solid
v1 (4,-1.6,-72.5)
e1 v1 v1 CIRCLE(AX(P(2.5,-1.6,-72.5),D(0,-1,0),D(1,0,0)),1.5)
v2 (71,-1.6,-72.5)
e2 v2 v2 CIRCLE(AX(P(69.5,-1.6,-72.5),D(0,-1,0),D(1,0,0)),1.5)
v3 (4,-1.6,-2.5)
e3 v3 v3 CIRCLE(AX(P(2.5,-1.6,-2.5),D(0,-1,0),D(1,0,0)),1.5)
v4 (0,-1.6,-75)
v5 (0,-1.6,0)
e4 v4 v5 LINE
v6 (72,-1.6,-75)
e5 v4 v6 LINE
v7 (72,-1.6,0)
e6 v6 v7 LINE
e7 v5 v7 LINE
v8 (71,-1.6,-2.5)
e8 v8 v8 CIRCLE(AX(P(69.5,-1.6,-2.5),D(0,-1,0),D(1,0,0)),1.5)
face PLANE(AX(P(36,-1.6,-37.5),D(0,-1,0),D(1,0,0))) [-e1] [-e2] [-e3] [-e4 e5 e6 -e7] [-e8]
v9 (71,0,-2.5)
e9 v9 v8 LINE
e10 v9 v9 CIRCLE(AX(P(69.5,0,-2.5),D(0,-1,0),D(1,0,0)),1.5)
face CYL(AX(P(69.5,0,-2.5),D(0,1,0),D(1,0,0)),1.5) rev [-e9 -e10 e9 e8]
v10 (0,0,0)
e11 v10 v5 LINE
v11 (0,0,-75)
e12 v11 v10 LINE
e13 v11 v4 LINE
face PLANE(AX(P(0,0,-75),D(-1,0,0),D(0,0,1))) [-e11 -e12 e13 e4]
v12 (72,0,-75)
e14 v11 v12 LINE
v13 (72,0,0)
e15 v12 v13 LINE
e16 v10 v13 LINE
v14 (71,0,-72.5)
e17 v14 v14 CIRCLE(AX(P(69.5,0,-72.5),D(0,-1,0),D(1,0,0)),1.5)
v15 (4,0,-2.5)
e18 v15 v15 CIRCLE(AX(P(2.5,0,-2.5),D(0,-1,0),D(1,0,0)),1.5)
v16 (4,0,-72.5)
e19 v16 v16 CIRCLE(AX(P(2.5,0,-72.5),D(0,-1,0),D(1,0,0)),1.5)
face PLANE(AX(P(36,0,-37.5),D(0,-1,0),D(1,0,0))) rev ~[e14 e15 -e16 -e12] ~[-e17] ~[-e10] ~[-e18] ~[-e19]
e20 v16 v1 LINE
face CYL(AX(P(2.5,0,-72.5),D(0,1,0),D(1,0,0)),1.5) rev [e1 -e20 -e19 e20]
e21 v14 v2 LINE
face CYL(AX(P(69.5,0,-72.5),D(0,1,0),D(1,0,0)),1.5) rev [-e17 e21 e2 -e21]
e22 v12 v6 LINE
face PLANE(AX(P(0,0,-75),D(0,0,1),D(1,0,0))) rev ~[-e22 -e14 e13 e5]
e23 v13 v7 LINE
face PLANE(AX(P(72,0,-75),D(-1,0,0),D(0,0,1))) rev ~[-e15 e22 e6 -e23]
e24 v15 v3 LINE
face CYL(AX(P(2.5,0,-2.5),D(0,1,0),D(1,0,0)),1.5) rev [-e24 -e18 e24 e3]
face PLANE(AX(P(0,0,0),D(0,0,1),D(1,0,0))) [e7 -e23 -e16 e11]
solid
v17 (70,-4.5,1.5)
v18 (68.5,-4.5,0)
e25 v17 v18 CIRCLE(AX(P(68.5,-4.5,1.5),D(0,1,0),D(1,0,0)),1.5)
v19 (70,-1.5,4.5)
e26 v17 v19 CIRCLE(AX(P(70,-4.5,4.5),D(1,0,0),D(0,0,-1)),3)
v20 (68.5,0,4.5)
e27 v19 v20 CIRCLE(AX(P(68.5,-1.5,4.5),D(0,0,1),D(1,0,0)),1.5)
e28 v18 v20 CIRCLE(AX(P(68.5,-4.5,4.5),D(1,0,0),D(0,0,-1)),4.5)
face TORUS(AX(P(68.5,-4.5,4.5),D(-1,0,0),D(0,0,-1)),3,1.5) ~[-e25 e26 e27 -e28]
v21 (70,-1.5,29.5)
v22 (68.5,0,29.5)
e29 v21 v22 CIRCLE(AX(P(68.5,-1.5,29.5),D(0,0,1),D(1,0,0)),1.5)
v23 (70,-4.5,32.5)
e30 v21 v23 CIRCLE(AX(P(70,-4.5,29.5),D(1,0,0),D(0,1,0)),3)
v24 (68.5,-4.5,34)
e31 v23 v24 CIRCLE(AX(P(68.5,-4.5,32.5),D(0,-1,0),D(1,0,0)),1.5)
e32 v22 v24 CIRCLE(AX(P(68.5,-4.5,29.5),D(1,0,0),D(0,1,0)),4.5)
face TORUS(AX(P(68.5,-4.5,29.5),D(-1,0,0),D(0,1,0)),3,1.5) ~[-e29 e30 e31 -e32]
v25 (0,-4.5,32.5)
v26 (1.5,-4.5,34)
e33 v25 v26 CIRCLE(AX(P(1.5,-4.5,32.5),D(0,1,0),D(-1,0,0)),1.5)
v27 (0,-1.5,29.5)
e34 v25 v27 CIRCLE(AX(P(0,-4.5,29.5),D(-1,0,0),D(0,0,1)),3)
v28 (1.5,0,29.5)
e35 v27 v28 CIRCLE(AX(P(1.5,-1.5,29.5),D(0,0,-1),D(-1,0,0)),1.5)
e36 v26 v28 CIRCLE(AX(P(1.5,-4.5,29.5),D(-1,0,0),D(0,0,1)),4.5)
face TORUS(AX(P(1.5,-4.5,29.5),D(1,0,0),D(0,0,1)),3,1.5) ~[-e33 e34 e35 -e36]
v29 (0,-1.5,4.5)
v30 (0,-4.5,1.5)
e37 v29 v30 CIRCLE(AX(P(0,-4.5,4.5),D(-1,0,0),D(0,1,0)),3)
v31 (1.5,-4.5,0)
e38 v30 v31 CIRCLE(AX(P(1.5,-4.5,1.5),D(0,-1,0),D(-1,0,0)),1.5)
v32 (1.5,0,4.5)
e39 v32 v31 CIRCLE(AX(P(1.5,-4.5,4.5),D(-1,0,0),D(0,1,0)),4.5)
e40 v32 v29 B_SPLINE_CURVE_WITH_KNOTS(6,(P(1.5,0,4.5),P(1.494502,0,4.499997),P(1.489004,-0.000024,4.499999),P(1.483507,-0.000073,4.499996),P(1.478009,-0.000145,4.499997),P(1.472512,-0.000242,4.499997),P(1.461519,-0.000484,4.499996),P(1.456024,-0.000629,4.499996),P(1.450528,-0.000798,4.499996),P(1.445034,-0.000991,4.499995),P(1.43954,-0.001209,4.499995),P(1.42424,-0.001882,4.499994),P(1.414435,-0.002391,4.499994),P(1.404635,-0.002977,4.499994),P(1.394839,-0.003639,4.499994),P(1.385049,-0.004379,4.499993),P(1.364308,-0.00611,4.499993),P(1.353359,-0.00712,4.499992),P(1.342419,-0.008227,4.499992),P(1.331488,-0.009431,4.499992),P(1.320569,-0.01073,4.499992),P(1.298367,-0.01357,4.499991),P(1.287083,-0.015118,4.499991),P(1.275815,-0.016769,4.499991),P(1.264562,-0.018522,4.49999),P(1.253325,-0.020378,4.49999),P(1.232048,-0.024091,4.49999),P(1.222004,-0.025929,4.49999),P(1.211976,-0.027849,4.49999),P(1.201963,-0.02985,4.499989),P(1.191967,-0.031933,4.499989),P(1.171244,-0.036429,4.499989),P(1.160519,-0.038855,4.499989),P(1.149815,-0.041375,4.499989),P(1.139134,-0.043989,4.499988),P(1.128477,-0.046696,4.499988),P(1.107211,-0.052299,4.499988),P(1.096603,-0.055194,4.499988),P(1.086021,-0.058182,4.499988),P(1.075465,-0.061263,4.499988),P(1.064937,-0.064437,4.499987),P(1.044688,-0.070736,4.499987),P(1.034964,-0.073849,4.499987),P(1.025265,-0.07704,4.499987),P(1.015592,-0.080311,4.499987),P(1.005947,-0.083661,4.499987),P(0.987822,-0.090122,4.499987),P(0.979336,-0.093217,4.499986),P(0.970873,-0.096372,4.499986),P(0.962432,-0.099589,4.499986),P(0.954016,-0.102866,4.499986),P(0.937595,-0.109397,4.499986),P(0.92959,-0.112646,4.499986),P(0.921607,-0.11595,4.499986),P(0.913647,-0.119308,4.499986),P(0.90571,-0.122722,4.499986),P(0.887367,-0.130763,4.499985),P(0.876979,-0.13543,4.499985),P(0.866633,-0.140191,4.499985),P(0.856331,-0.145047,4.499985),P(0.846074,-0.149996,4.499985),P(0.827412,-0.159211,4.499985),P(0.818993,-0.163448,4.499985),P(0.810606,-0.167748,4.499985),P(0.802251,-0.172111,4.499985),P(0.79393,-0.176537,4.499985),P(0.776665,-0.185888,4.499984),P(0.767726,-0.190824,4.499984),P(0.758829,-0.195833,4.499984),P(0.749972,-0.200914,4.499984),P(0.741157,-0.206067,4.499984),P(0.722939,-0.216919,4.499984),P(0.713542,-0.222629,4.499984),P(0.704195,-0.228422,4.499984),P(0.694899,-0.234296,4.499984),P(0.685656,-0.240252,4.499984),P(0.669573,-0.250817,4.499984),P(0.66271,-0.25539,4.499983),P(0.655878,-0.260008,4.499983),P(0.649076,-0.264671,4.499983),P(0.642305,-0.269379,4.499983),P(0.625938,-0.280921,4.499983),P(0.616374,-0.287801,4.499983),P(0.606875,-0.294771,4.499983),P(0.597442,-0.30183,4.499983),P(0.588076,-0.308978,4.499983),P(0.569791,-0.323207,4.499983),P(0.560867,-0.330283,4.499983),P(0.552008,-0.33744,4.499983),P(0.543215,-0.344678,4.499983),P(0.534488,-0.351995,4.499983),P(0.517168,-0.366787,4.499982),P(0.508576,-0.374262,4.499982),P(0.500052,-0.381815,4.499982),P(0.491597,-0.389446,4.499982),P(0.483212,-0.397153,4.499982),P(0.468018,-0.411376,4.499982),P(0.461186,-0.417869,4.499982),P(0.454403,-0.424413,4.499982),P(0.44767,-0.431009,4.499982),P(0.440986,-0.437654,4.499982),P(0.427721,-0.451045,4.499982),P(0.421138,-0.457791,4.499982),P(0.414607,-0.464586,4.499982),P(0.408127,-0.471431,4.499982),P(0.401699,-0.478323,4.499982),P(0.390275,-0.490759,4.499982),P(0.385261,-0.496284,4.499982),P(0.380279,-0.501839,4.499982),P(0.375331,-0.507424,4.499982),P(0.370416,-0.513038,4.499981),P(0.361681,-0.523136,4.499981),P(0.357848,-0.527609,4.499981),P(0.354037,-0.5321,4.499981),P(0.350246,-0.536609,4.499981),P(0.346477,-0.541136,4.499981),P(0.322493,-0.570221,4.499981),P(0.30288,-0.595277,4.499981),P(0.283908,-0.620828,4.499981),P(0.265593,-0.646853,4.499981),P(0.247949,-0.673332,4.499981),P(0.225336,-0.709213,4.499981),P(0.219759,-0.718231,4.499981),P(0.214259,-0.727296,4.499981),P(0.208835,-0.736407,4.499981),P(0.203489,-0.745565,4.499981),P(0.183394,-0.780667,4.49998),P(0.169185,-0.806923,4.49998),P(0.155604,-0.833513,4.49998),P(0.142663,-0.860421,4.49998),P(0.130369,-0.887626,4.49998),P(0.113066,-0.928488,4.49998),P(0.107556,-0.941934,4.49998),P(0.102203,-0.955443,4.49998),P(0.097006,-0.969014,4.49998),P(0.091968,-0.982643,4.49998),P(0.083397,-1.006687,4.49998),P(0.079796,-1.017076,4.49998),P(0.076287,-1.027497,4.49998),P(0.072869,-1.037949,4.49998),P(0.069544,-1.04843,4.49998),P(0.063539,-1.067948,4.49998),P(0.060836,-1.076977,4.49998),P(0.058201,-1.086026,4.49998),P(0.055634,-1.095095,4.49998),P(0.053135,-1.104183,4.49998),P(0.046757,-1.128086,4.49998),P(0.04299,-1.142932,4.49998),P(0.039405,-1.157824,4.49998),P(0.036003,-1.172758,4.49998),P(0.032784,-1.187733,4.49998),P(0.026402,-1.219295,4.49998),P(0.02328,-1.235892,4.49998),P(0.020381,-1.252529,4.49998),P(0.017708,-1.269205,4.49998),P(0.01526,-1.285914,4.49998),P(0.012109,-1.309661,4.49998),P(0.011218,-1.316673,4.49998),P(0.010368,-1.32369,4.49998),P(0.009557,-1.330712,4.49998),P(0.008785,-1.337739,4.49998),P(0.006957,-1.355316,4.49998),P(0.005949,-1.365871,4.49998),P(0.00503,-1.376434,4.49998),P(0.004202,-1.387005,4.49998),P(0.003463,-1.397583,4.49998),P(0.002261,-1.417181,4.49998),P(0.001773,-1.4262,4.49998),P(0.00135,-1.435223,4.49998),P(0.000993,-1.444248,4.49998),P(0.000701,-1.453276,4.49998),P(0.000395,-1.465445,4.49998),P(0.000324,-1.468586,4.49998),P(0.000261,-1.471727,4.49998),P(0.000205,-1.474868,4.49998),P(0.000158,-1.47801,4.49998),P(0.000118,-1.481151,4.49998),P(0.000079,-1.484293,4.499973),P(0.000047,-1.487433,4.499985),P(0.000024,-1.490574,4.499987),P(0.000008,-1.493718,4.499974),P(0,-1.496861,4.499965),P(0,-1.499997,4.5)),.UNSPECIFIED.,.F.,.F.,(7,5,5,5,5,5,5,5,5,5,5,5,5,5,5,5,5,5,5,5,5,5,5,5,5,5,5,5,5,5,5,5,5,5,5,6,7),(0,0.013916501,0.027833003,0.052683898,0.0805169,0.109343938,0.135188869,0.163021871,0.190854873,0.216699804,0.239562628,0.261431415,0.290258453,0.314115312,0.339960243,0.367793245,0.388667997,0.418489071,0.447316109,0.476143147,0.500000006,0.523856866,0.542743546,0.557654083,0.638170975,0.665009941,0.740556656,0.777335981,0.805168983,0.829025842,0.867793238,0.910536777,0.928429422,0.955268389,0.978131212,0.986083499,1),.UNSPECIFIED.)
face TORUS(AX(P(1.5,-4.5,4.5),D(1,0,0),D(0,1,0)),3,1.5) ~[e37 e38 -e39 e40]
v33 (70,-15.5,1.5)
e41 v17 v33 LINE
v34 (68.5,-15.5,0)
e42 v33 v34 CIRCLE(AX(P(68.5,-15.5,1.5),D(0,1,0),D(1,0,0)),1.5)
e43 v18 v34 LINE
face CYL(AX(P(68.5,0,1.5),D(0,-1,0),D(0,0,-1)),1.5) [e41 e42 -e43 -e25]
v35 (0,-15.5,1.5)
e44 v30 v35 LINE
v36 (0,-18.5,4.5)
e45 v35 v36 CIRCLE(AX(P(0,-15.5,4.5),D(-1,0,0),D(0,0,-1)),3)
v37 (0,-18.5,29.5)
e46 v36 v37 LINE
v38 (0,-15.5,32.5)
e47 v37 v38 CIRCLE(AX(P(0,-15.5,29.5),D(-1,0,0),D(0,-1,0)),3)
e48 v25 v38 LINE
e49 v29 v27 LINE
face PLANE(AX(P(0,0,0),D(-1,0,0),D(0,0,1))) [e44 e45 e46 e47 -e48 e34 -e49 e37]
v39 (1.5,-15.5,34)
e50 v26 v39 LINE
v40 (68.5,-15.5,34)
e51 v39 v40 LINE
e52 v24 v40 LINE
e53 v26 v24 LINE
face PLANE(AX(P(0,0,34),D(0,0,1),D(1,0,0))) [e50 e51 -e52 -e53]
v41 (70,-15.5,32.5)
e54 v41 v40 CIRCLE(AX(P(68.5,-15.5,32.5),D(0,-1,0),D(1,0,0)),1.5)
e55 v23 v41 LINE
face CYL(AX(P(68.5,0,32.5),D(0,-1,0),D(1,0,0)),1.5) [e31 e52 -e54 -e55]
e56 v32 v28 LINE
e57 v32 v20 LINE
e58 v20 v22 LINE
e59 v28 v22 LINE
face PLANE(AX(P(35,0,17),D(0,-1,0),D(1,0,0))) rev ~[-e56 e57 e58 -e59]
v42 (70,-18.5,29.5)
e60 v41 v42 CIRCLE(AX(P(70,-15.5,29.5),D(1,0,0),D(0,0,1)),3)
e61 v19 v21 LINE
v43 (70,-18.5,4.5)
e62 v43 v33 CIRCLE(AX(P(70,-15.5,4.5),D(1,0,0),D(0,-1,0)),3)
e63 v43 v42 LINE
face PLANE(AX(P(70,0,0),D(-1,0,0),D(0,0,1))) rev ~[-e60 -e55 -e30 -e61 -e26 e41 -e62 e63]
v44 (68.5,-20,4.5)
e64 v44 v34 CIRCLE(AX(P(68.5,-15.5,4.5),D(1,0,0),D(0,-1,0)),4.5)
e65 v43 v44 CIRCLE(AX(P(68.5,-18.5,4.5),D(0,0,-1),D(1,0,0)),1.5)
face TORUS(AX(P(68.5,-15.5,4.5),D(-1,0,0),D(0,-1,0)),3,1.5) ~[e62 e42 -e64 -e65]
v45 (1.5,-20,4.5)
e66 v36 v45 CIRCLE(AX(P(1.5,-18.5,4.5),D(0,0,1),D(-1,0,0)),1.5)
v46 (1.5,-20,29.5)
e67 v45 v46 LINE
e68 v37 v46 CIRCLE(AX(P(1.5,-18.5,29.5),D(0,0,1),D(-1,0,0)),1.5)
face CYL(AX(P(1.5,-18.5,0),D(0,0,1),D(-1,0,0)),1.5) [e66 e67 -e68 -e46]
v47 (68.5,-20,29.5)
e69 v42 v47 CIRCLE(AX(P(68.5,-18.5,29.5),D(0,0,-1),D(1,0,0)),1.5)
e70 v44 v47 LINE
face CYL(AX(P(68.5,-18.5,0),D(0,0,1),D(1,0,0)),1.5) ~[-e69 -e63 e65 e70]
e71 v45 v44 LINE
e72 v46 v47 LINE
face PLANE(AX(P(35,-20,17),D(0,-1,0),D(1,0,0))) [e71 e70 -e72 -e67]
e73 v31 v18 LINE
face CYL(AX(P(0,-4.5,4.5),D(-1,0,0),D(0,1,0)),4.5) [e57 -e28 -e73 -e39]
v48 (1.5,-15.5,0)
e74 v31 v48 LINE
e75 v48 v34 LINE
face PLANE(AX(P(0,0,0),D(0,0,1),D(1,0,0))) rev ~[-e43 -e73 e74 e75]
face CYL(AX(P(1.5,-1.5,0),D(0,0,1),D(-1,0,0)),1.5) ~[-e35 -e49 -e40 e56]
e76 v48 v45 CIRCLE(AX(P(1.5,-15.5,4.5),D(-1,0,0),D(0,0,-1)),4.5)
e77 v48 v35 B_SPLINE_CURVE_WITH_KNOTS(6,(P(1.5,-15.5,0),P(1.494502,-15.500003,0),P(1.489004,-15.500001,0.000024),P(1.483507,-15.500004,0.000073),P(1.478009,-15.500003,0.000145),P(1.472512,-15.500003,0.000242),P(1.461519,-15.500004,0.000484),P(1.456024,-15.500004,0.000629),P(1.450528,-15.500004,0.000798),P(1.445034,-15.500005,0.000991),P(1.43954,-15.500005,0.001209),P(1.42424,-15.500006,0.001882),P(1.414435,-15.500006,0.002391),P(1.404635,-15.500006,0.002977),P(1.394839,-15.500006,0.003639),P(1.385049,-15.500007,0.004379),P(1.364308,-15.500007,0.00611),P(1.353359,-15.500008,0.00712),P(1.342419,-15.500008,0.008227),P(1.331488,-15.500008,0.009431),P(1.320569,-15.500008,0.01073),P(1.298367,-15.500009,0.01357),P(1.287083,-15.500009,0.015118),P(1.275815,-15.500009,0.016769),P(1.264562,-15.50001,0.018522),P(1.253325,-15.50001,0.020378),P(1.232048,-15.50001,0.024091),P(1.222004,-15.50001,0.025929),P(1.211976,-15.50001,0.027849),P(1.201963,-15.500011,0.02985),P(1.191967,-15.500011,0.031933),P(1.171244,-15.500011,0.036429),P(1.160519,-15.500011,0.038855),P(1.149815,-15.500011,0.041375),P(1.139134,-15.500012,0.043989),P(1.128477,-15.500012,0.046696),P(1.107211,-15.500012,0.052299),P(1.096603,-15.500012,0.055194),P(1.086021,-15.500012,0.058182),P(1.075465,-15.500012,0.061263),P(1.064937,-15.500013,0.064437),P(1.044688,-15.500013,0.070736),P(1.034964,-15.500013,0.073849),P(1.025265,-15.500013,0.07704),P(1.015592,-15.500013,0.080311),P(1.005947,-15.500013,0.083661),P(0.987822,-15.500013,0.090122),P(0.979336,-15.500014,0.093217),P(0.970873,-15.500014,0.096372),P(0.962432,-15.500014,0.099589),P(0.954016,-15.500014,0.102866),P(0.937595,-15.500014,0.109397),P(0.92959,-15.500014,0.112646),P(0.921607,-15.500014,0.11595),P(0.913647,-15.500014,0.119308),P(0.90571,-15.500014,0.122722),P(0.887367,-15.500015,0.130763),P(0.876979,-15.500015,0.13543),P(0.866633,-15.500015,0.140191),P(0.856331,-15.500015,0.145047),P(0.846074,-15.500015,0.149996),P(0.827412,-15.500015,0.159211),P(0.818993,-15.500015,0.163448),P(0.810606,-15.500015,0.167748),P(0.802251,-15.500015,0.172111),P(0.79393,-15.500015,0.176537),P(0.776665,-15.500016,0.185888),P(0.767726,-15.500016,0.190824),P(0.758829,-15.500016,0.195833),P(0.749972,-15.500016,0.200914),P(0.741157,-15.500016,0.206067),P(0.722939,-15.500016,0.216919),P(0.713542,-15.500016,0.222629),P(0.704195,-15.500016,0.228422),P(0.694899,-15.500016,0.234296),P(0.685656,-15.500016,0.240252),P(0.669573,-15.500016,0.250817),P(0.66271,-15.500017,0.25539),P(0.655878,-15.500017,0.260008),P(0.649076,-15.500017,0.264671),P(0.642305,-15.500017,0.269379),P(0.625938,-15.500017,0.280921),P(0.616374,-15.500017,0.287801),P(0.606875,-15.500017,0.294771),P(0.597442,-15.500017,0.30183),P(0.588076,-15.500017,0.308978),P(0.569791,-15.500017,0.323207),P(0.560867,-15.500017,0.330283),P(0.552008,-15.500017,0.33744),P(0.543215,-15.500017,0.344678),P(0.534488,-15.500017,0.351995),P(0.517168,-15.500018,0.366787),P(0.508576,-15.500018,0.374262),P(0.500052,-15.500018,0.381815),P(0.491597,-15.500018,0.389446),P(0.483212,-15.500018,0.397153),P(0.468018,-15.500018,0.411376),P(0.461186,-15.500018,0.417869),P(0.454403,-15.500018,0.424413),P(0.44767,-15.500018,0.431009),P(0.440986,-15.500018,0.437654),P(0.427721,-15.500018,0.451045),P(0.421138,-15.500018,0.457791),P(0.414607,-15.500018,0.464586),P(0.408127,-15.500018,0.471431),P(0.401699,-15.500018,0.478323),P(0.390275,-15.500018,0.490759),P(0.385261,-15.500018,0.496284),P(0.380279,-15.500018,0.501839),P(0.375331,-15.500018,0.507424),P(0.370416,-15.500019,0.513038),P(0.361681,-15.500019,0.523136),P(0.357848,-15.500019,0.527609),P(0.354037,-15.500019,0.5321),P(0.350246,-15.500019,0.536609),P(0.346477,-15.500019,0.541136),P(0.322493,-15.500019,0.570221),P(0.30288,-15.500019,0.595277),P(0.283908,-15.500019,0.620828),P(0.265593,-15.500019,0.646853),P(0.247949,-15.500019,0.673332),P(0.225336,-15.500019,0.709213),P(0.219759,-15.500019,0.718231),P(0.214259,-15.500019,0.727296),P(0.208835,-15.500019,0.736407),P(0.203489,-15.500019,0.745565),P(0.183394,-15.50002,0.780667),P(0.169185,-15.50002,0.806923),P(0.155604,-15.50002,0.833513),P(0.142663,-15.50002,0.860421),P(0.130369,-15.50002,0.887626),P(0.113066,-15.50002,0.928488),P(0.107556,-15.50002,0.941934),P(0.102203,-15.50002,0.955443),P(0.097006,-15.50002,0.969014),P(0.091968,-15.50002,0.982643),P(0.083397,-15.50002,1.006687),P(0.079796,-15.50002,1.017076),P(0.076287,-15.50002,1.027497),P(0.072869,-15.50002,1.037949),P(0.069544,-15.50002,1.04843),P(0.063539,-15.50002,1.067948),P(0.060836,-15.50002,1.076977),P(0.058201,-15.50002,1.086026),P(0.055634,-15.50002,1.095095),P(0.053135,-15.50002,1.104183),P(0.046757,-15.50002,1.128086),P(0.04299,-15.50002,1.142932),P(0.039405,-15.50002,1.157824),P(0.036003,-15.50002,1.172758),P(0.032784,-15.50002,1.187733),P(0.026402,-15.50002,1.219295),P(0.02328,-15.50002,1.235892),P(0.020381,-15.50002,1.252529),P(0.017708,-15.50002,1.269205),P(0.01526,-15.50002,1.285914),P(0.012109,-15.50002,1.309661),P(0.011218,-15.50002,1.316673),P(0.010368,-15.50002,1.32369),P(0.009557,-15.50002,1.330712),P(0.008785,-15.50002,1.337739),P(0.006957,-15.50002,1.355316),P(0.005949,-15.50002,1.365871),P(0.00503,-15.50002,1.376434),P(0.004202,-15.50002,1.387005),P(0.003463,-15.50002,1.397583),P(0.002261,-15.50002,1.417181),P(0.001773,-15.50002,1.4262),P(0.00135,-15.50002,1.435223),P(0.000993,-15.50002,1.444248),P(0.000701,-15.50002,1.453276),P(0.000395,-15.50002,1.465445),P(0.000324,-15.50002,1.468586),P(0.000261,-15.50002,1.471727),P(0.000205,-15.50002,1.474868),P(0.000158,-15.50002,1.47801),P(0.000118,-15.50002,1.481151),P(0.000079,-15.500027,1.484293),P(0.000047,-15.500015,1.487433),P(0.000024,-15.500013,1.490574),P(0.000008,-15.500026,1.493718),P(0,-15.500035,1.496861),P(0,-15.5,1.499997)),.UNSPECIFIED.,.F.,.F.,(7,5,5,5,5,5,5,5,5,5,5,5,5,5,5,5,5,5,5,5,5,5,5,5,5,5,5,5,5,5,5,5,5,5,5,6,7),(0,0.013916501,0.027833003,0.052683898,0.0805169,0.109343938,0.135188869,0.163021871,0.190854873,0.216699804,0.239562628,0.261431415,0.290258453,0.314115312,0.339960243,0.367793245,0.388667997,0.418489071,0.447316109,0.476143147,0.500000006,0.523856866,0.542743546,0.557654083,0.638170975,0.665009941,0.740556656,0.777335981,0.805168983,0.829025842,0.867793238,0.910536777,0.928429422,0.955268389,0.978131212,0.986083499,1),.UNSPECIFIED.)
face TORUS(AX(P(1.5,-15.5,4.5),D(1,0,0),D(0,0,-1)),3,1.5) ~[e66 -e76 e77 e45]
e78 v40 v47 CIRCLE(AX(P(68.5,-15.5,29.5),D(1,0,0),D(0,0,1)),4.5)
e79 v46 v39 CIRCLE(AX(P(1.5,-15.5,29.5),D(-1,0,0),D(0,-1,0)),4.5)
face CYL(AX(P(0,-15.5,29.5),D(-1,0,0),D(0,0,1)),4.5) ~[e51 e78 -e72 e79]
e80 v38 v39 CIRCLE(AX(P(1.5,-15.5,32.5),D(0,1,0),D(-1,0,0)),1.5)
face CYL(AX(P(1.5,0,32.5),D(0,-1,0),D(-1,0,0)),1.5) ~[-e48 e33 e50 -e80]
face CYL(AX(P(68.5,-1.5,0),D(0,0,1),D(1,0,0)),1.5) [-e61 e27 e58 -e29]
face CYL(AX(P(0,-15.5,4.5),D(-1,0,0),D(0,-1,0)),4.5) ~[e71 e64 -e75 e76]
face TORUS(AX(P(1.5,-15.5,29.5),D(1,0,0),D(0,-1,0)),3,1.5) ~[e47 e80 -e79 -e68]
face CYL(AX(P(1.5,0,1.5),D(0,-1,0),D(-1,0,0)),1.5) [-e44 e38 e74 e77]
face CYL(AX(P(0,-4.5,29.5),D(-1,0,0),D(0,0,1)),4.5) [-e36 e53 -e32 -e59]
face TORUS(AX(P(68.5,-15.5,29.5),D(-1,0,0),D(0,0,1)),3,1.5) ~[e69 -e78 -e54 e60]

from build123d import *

# Parameters (mm, degrees)
F0_W         = 72
F0_H         = 75
F0_R         = 1.5
F1_DEPTH     = 1.6
F2_W         = 70
F2_H         = 34
F3_DEPTH     = 20
F4_R         = 1.5
F5_T1_DEPTH  = 70
F5_T4_ANGLE  = 90
F5_T6_ANGLE  = 90
F5_T8_ANGLE  = 90
F5_T10_ANGLE = 90
F5_T12_ANGLE = 90
F5_T14_ANGLE = 90
F5_T16_ANGLE = 90
F5_T18_ANGLE = 90


# Not quite as in the source:
# - a fillet or chamfer that OpenCascade refuses, or shapes differently, is made with other operations: its cross-section is extruded or revolved along the edge and cut away or added


with BuildPart() as f1:
    # F0 (on Front) → F1 (new body)
    with BuildSketch(Plane.XZ):
        with Locations((36, -37.5)):
            Rectangle(F0_W, F0_H)
        with Locations((2.5, -72.5)):
            Circle(F0_R, mode=Mode.SUBTRACT)
        with Locations((69.5, -72.5)):
            Circle(F0_R, mode=Mode.SUBTRACT)
        with Locations((2.5, -2.5)):
            Circle(F0_R, mode=Mode.SUBTRACT)
        with Locations((69.5, -2.5)):
            Circle(F0_R, mode=Mode.SUBTRACT)
    extrude(amount=F1_DEPTH)


with BuildPart() as f3:
    # F2 (on Front) → F3 (new body)
    with BuildSketch(Plane.XZ):
        with Locations((35, 17)):
            Rectangle(F2_W, F2_H)
    extrude(amount=F3_DEPTH)

    # F4
    f4_edges = [f3.edges().sort_by_distance(p)[0] for p in [
        (70, -10, 0),
        (70, -10, 34),
        (70, 0, 17),
        (70, -20, 17),
        (0, -10, 34),
        (0, -10, 0),
        (0, 0, 17),
        (0, -20, 17),
    ]]
    fillet(f4_edges, radius=F4_R)

    # F5: fillet of radius 4.5 on 4 edges, made by hand

    # F5_s2 → F5_t1 (cut)
    with BuildSketch(Plane.YZ):
        with BuildLine():
            ThreePointArc((-4.5, 34), (-1.3180194847, 32.6819805153), (0, 29.5))
            Line((0, 29.5), (0, 34))
            Line((0, 34), (-4.5, 34))
        make_face()
        with BuildLine():
            ThreePointArc((0, 4.5), (-1.3180194847, 1.3180194847), (-4.5, 0))
            Line((-4.5, 0), (0, 0))
            Line((0, 0), (0, 4.5))
        make_face()
        with BuildLine():
            ThreePointArc((-15.5, 34), (-18.6819805153, 32.6819805153), (-20, 29.5))
            Line((-20, 29.5), (-20, 34))
            Line((-20, 34), (-15.5, 34))
        make_face()
        with BuildLine():
            ThreePointArc((-20, 4.5), (-18.6819805153, 1.3180194847), (-15.5, 0))
            Line((-15.5, 0), (-20, 0))
            Line((-20, 0), (-20, 4.5))
        make_face()
    extrude(amount=F5_T1_DEPTH, mode=Mode.SUBTRACT)

    # F5_s3 → F5_t4 (revolve, cut)
    with BuildSketch(Plane.XZ.offset(15.5)):
        with BuildLine():
            ThreePointArc((0, 1.5), (0.4393398282, 0.4393398282), (1.5, 0))
            Line((1.5, 0), (0, 0))
            Line((0, 0), (0, 1.5))
        make_face()
    revolve(axis=Axis((0, -15.5, 4.5), (-1, 0, 0)), revolution_arc=F5_T4_ANGLE, mode=Mode.SUBTRACT)

    # F5_s5 → F5_t6 (revolve, cut)
    with BuildSketch(Plane.XY.offset(4.5)):
        with BuildLine():
            ThreePointArc((70, -18.5), (69.5606601718, -19.5606601718), (68.5, -20))
            Line((68.5, -20), (70, -20))
            Line((70, -20), (70, -18.5))
        make_face()
    revolve(axis=Axis((70, -15.5, 4.5), (1, 0, 0)), revolution_arc=F5_T6_ANGLE, mode=Mode.SUBTRACT)

    # F5_s7 → F5_t8 (revolve, cut)
    with BuildSketch(Plane.XZ.offset(15.5)):
        with BuildLine():
            ThreePointArc((70, 32.5), (69.5606601718, 33.5606601718), (68.5, 34))
            Line((68.5, 34), (70, 34))
            Line((70, 34), (70, 32.5))
        make_face()
    revolve(axis=Axis((70, -15.5, 29.5), (1, 0, 0)), revolution_arc=F5_T8_ANGLE, mode=Mode.SUBTRACT)

    # F5_s9 → F5_t10 (revolve, cut)
    with BuildSketch(Plane.XY.offset(29.5)):
        with BuildLine():
            ThreePointArc((0, -18.5), (0.4393398282, -19.5606601718), (1.5, -20))
            Line((1.5, -20), (0, -20))
            Line((0, -20), (0, -18.5))
        make_face()
    revolve(axis=Axis((0, -15.5, 29.5), (-1, 0, 0)), revolution_arc=F5_T10_ANGLE, mode=Mode.SUBTRACT)

    # F5_s11 → F5_t12 (revolve, cut)
    with BuildSketch(Plane.XY.offset(4.5)):
        with BuildLine():
            ThreePointArc((0, -1.5), (0.4393398282, -0.4393398282), (1.5, 0))
            Line((1.5, 0), (0, 0))
            Line((0, 0), (0, -1.5))
        make_face()
    revolve(axis=Axis((0, -4.5, 4.5), (-1, 0, 0)), revolution_arc=F5_T12_ANGLE, mode=Mode.SUBTRACT)

    # F5_s13 → F5_t14 (revolve, cut)
    with BuildSketch(Plane.XZ.offset(4.5)):
        with BuildLine():
            ThreePointArc((70, 1.5), (69.5606601718, 0.4393398282), (68.5, 0))
            Line((68.5, 0), (70, 0))
            Line((70, 0), (70, 1.5))
        make_face()
    revolve(axis=Axis((70, -4.5, 4.5), (1, 0, 0)), revolution_arc=F5_T14_ANGLE, mode=Mode.SUBTRACT)

    # F5_s15 → F5_t16 (revolve, cut)
    with BuildSketch(Plane.XY.offset(29.5)):
        with BuildLine():
            ThreePointArc((70, -1.5), (69.5606601718, -0.4393398282), (68.5, 0))
            Line((68.5, 0), (70, 0))
            Line((70, 0), (70, -1.5))
        make_face()
    revolve(axis=Axis((70, -4.5, 29.5), (1, 0, 0)), revolution_arc=F5_T16_ANGLE, mode=Mode.SUBTRACT)

    # F5_s17 → F5_t18 (revolve, cut)
    with BuildSketch(Plane.XZ.offset(4.5)):
        with BuildLine():
            ThreePointArc((0, 32.5), (0.4393398282, 33.5606601718), (1.5, 34))
            Line((1.5, 34), (0, 34))
            Line((0, 34), (0, 32.5))
        make_face()
    revolve(axis=Axis((0, -4.5, 29.5), (-1, 0, 0)), revolution_arc=F5_T18_ANGLE, mode=Mode.SUBTRACT)


solid = Compound([f1.part, f3.part])
